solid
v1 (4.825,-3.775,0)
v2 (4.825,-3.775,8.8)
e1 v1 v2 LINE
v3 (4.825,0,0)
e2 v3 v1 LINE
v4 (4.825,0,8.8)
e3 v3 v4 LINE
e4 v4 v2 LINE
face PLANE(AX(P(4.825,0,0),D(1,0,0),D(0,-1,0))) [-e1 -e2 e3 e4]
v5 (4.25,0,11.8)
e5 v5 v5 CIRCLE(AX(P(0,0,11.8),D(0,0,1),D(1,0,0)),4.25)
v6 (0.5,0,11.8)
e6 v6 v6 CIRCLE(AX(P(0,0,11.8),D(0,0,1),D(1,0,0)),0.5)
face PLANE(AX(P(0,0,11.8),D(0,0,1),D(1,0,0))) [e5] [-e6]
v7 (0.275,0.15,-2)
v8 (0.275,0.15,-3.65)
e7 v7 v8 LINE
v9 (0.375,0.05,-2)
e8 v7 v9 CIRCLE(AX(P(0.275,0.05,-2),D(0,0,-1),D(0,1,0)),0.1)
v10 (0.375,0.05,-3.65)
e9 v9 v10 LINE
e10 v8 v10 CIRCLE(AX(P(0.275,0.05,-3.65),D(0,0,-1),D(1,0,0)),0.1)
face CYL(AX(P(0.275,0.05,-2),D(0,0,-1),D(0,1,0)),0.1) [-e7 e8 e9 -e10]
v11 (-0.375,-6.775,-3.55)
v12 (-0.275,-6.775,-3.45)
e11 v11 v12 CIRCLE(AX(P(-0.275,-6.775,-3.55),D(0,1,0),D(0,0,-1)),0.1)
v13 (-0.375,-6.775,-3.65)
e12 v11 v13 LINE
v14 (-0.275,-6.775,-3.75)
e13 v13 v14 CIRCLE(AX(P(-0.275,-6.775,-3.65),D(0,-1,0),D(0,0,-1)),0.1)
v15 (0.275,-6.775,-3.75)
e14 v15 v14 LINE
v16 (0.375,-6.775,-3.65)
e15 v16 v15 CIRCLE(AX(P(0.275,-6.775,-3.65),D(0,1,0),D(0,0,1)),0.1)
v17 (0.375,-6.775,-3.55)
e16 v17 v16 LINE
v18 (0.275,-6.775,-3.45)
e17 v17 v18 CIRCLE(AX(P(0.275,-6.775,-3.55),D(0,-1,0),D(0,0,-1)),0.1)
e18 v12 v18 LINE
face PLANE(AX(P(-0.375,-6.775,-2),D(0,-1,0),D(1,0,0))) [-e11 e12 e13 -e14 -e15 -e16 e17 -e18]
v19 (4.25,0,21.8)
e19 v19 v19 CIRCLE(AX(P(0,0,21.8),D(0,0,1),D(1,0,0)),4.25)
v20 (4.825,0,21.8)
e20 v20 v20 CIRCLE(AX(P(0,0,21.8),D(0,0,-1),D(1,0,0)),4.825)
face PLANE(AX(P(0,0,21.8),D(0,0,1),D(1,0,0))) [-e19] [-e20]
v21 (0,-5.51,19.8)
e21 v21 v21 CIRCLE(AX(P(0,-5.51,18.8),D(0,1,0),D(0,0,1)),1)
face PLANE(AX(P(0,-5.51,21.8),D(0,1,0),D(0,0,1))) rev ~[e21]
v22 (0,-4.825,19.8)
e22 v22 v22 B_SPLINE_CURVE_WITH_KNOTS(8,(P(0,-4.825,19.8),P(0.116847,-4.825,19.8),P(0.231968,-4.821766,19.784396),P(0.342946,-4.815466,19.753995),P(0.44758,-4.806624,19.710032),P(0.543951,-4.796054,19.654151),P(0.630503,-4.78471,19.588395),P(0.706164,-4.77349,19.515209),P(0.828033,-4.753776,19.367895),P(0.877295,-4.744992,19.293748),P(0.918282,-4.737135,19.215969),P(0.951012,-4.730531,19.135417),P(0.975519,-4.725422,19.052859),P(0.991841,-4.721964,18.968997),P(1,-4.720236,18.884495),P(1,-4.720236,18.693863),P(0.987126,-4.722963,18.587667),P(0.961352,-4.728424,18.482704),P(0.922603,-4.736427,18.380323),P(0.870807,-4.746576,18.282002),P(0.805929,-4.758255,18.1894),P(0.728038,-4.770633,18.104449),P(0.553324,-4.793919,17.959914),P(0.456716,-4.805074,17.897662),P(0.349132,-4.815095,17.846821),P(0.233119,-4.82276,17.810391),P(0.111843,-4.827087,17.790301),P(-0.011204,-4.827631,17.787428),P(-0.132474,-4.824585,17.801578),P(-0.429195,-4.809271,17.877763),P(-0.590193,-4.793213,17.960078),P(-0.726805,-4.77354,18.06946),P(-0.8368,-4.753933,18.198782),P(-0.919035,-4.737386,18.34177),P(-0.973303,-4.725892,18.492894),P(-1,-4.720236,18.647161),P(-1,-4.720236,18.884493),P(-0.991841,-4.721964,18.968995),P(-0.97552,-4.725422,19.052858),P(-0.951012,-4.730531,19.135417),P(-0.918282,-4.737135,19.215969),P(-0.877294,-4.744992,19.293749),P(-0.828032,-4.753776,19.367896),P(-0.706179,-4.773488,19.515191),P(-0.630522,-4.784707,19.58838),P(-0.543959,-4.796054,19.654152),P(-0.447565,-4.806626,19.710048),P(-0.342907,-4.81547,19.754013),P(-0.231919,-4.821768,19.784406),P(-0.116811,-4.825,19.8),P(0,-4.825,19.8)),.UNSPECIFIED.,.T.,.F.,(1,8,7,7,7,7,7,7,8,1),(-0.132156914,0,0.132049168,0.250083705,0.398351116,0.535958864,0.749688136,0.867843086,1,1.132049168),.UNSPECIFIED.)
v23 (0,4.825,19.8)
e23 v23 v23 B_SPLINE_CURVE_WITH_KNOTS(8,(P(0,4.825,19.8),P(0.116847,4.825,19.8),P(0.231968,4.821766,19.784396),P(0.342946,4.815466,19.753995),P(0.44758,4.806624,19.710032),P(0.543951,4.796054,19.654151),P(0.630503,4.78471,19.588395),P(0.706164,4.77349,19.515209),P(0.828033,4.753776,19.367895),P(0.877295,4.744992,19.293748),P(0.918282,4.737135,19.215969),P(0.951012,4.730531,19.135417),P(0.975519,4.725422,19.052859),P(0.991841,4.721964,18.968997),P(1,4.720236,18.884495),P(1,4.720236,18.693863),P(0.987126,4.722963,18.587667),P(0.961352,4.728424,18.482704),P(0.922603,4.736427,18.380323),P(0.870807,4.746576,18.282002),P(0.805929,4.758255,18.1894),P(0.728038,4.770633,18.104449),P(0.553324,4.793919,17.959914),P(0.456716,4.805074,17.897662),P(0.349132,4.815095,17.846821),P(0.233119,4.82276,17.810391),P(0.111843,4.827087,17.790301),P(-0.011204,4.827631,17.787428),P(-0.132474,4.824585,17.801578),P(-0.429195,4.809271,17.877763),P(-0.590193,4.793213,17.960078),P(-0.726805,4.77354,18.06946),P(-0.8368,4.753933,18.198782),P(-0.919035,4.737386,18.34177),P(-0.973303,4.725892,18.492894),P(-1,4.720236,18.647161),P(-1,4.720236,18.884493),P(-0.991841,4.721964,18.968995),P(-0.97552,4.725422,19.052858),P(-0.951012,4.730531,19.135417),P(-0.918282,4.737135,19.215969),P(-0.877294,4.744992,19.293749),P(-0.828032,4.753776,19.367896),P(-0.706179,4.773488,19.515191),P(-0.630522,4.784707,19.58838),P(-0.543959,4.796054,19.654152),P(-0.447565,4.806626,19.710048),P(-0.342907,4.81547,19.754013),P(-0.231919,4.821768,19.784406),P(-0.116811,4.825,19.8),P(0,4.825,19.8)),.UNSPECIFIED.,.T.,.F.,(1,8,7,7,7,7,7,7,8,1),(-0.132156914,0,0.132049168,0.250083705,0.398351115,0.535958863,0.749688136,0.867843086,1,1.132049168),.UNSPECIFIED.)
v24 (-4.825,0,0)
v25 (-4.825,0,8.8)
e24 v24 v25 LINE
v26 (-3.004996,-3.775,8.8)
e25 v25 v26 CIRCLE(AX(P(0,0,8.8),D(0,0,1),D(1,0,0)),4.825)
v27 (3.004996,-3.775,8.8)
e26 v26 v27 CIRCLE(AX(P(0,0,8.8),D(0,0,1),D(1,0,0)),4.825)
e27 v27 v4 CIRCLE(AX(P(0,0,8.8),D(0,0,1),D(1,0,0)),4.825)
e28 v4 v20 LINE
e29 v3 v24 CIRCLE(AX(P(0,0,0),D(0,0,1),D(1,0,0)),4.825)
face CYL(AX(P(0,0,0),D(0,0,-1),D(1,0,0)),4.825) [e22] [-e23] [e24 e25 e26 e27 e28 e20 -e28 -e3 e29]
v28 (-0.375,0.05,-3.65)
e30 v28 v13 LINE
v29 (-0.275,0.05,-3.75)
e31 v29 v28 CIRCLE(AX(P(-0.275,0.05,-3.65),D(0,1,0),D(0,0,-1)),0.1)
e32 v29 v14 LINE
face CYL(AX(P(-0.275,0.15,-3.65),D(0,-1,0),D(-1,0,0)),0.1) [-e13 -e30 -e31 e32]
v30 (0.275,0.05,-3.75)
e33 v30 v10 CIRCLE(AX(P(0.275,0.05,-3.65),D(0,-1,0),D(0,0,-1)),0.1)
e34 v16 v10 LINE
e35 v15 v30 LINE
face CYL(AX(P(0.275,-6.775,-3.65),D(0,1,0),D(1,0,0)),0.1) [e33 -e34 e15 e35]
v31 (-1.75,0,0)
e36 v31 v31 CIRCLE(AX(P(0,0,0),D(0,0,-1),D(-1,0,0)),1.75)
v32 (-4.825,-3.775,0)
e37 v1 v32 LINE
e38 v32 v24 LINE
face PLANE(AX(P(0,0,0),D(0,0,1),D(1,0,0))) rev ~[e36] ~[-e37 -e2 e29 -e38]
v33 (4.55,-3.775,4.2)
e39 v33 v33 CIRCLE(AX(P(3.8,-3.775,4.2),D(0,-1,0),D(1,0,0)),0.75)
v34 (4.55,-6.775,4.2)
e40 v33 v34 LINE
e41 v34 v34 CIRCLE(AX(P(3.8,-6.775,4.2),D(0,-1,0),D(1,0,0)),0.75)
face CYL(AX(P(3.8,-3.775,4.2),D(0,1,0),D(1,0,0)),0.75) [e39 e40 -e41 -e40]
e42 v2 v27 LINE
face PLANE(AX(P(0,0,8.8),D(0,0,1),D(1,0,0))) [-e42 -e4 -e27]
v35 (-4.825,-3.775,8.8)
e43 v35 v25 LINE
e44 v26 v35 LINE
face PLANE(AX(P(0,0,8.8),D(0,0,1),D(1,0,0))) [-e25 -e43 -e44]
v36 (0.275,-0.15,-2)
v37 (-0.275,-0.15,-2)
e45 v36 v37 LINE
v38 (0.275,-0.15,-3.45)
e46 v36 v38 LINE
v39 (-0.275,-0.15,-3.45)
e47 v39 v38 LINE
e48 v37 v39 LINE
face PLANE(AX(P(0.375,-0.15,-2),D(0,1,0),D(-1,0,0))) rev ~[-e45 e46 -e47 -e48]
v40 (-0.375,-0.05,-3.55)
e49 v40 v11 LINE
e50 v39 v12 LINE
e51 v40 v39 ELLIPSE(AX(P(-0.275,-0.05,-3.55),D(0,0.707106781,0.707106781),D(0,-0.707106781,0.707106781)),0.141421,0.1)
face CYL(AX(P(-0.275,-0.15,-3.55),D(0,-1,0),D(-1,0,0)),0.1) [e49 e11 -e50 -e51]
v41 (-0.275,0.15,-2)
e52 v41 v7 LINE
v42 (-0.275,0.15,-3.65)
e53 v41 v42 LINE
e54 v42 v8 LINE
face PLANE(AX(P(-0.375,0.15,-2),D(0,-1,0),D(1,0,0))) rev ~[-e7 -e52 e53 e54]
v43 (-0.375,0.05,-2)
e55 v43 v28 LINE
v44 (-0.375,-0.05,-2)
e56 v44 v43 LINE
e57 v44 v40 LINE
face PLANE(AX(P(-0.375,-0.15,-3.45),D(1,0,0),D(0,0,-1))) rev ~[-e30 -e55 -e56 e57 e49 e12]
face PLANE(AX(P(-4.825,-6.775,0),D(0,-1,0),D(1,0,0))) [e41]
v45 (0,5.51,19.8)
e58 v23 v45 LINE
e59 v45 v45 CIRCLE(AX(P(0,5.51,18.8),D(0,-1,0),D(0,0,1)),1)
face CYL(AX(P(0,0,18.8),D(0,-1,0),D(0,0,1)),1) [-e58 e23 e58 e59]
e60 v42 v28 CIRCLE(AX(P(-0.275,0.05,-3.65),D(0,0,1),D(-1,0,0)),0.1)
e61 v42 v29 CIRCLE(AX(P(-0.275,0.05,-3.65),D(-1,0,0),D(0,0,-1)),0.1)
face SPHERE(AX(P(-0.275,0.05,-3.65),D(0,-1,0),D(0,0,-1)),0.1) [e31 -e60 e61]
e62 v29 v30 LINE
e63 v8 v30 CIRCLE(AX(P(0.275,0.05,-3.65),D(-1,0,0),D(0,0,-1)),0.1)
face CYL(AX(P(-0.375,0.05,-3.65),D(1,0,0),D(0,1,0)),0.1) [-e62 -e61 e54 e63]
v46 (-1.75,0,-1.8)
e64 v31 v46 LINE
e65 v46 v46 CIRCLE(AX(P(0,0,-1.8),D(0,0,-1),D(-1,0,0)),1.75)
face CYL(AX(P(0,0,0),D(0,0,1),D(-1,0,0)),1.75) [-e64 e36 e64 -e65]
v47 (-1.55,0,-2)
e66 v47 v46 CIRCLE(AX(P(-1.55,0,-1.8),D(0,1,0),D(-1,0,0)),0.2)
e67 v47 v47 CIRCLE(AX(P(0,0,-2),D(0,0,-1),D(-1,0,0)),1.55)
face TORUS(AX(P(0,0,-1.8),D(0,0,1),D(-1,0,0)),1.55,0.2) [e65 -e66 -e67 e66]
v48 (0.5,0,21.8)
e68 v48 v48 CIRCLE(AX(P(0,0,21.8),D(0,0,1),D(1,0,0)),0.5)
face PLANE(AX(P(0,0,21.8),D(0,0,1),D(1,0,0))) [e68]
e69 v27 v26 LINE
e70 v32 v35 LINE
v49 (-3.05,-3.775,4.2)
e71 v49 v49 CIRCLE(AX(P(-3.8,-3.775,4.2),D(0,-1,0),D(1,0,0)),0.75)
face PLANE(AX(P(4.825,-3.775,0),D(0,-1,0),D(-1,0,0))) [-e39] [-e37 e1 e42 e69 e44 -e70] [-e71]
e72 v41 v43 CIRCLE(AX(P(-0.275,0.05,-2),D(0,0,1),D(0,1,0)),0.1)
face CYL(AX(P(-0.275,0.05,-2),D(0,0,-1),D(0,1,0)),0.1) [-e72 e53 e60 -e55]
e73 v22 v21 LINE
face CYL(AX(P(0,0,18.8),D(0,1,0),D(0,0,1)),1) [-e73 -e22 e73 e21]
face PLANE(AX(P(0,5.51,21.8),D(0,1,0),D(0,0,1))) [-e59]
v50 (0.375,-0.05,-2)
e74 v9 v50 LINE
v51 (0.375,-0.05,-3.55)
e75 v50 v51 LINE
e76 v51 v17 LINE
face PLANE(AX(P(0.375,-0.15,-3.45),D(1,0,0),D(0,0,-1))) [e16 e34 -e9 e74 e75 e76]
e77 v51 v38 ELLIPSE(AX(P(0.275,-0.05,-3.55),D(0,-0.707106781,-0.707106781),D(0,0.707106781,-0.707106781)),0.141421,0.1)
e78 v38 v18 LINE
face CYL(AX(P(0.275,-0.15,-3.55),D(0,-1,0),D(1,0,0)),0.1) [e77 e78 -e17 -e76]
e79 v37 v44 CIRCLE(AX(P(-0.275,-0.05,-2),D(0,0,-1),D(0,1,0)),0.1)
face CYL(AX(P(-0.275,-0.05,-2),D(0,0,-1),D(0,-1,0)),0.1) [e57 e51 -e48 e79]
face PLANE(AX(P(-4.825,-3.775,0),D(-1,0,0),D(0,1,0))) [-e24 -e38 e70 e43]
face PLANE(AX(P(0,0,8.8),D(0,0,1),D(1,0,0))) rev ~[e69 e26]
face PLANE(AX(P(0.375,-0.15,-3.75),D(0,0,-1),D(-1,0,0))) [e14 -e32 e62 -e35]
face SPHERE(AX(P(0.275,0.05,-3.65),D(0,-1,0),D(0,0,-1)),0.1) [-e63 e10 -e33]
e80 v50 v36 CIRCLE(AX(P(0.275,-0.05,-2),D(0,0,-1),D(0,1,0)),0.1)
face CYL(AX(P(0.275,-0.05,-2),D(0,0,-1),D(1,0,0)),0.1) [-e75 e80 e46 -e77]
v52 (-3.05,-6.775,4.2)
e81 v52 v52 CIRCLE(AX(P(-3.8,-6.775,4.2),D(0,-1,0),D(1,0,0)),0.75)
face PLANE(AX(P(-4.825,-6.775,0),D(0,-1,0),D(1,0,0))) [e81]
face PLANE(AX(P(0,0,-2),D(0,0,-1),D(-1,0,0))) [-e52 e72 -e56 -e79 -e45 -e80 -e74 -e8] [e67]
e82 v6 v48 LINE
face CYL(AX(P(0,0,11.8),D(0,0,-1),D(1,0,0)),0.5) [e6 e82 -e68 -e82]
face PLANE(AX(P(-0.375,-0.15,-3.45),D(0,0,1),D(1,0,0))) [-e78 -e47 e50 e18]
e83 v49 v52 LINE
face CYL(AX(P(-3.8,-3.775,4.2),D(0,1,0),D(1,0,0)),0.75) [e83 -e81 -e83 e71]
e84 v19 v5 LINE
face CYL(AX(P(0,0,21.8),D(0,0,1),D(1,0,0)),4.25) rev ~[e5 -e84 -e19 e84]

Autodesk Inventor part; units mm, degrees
ref_plane "YZ Plane" through (0, 0, 0) normal (1, 0, 0) x (0, 1, 0)
sketch "Sketch1" plane through (0, 0, 0) normal (0, 0, 1) x (1, 0, 0)
  arc A0 (4.825, 0) -> (-4.825, 0) centre (0, 0) ccw
  line L0 (4.825, 0) -> (4.825, -3.775)
  line L1 (4.825, -3.775) -> (-4.825, -3.775)
  line L2 (-4.825, -3.775) -> (-4.825, 0)
  dimension "d0" = 9.65
  dimension "d2" = 3.775
  dimension "d3" = 9.65
extrude "Extrusion1" add sketch "Sketch1" along normal blind 8.8
sketch "Sketch2" plane through (0, 0, 8.8) normal (0, 0, 1) x (1, 0, 0)
  arc A0 (4.825, 0) -> (-4.825, 0) centre (0, 0) ccw projected
  circle A1 centre (0, 0) radius 4.825
extrude "Extrusion2" add sketch "Sketch2" along normal blind 13
ref_plane "Work Plane2" through (0, 0, 11.8) normal (0, 0, 1) x (1, 0, 0)
sketch "Sketch5" plane through (-4.825, -3.775, 0) normal (0, -1, 0) x (1, 0, 0)
  line L0 (1.82, 8.8) -> (7.83, 8.8) projected
  line L1 (0, 0) -> (0, 8.8) projected
  circle A0 centre (1.025, 4.2) radius 0.75
  circle A1 centre (8.625, 4.2) radius 0.75
  point P0 (4.825, 0)
  dimension "d15" = 1.5
  dimension "d17" = 1.5
  dimension "d18" = 4.6
  dimension "d19" = 4.6
  dimension "d20" = 7.6
  dimension "d21" = 1.025
extrude "Extrusion5" add sketch "Sketch5" along normal blind 3
sketch "Sketch6" plane through (0, 0, 0) normal (0, 0, -1) x (-1, 0, 0)
  arc A0 (4.825, 0) -> (-4.825, 0) centre (0, 0) ccw projected
  circle A1 centre (0, 0) radius 1.75
  dimension "d24" = 3.5
extrude "Extrusion6" add sketch "Sketch6" along normal blind 2
sketch "Sketch7" plane through (0, 0, -2) normal (0, 0, -1) x (-1, 0, 0)
  circle A0 centre (0, 0) radius 1.75 projected
  line L0 (-0.375, 0.15) -> (-0.375, -0.15)
  line L1 (-0.375, -0.15) -> (0.375, -0.15)
  line L2 (0.375, -0.15) -> (0.375, 0.15)
  line L3 (0.375, 0.15) -> (-0.375, 0.15)
  dimension "d28" = 0.3
  dimension "d30" = 0.75
  dimension "d31" = 0.375
  dimension "d32" = 0.15
extrude "Extrusion7" add sketch "Sketch7" along normal blind 1.75 contours L3 L2 L1 L0
sketch "Sketch8" plane through (-0.375, -0.15, -2) normal (0, -1, 0) x (1, 0, 0)
  line L0 (0, 0) -> (0, -1.75) projected
  line L1 (0.75, -1.75) -> (0, -1.75) projected
  line L2 (0.75, 0) -> (0.75, -1.75) projected
  line L3 (0, -1.75) -> (0, -1.45)
  line L4 (0, -1.45) -> (0.75, -1.45)
  line L5 (0.75, -1.45) -> (0.75, -1.75)
  line L6 (0, -1.75) -> (0.75, -1.75)
  point P0 (0.375, 2)
  dimension "d35" = 0.3
  dimension "d36" = 0.75
extrude "Extrusion8" add sketch "Sketch8" along normal blind 6.625
fillet "Fillet1" radius 0.2 1 edges at (1.75, 0, -2)
fillet "Fillet2" radius 0.1 9 edges at (-0.375, -3.3125, -3.75) (0.375, -3.3125, -3.75) (-0.375, -3.4625, -3.45) (0, 0.15, -3.75) (-0.375, 0.15, -2.875) (-0.375, -0.15, -2.725) (0.375, 0.15, -2.875) (0.375, -0.15, -2.725) (0.375, -3.4625, -3.45)
ref_plane "Work Plane1" through (0, 0, 21.8) normal (0, 1, 0) x (0, 0, 1)
sketch "Sketch9" plane through (0, 0, 21.8) normal (0, 1, 0) x (0, 0, 1)
  circle A0 centre (-3, 0) radius 1
  line L0 (0, -4.825) -> (0, 4.825) projected
  line L1 (0, 0) -> (-8.1755, 0)
  point P0 (-21.8, 0)
  dimension "d42" = 2
  dimension "d44" = 3
  dimension "d45" = 0
extrude "Extrusion9" add sketch "Sketch9" along normal mid plane 11.02
sketch "Sketch3" plane through (0, 0, 21.8) normal (0, 0, 1) x (1, 0, 0)
  circle A0 centre (0, 0) radius 4.825 projected
  circle A1 centre (0, 0) radius 4.25
  dimension "d8" = 8.5
extrude "Extrusion10" cut sketch "Sketch3" against normal blind 10 contours A1
sketch "Sketch4" plane through (0, 0, 11.8) normal (0, 0, 1) x (1, 0, 0)
  circle A0 centre (0, 0) radius 4.25 projected
  circle A1 centre (0, 0) radius 0.5
  dimension "d12" = 1
extrude "Extrusion4" add sketch "Sketch4" along normal blind 10 contours A1
properties part number "0731000105"
